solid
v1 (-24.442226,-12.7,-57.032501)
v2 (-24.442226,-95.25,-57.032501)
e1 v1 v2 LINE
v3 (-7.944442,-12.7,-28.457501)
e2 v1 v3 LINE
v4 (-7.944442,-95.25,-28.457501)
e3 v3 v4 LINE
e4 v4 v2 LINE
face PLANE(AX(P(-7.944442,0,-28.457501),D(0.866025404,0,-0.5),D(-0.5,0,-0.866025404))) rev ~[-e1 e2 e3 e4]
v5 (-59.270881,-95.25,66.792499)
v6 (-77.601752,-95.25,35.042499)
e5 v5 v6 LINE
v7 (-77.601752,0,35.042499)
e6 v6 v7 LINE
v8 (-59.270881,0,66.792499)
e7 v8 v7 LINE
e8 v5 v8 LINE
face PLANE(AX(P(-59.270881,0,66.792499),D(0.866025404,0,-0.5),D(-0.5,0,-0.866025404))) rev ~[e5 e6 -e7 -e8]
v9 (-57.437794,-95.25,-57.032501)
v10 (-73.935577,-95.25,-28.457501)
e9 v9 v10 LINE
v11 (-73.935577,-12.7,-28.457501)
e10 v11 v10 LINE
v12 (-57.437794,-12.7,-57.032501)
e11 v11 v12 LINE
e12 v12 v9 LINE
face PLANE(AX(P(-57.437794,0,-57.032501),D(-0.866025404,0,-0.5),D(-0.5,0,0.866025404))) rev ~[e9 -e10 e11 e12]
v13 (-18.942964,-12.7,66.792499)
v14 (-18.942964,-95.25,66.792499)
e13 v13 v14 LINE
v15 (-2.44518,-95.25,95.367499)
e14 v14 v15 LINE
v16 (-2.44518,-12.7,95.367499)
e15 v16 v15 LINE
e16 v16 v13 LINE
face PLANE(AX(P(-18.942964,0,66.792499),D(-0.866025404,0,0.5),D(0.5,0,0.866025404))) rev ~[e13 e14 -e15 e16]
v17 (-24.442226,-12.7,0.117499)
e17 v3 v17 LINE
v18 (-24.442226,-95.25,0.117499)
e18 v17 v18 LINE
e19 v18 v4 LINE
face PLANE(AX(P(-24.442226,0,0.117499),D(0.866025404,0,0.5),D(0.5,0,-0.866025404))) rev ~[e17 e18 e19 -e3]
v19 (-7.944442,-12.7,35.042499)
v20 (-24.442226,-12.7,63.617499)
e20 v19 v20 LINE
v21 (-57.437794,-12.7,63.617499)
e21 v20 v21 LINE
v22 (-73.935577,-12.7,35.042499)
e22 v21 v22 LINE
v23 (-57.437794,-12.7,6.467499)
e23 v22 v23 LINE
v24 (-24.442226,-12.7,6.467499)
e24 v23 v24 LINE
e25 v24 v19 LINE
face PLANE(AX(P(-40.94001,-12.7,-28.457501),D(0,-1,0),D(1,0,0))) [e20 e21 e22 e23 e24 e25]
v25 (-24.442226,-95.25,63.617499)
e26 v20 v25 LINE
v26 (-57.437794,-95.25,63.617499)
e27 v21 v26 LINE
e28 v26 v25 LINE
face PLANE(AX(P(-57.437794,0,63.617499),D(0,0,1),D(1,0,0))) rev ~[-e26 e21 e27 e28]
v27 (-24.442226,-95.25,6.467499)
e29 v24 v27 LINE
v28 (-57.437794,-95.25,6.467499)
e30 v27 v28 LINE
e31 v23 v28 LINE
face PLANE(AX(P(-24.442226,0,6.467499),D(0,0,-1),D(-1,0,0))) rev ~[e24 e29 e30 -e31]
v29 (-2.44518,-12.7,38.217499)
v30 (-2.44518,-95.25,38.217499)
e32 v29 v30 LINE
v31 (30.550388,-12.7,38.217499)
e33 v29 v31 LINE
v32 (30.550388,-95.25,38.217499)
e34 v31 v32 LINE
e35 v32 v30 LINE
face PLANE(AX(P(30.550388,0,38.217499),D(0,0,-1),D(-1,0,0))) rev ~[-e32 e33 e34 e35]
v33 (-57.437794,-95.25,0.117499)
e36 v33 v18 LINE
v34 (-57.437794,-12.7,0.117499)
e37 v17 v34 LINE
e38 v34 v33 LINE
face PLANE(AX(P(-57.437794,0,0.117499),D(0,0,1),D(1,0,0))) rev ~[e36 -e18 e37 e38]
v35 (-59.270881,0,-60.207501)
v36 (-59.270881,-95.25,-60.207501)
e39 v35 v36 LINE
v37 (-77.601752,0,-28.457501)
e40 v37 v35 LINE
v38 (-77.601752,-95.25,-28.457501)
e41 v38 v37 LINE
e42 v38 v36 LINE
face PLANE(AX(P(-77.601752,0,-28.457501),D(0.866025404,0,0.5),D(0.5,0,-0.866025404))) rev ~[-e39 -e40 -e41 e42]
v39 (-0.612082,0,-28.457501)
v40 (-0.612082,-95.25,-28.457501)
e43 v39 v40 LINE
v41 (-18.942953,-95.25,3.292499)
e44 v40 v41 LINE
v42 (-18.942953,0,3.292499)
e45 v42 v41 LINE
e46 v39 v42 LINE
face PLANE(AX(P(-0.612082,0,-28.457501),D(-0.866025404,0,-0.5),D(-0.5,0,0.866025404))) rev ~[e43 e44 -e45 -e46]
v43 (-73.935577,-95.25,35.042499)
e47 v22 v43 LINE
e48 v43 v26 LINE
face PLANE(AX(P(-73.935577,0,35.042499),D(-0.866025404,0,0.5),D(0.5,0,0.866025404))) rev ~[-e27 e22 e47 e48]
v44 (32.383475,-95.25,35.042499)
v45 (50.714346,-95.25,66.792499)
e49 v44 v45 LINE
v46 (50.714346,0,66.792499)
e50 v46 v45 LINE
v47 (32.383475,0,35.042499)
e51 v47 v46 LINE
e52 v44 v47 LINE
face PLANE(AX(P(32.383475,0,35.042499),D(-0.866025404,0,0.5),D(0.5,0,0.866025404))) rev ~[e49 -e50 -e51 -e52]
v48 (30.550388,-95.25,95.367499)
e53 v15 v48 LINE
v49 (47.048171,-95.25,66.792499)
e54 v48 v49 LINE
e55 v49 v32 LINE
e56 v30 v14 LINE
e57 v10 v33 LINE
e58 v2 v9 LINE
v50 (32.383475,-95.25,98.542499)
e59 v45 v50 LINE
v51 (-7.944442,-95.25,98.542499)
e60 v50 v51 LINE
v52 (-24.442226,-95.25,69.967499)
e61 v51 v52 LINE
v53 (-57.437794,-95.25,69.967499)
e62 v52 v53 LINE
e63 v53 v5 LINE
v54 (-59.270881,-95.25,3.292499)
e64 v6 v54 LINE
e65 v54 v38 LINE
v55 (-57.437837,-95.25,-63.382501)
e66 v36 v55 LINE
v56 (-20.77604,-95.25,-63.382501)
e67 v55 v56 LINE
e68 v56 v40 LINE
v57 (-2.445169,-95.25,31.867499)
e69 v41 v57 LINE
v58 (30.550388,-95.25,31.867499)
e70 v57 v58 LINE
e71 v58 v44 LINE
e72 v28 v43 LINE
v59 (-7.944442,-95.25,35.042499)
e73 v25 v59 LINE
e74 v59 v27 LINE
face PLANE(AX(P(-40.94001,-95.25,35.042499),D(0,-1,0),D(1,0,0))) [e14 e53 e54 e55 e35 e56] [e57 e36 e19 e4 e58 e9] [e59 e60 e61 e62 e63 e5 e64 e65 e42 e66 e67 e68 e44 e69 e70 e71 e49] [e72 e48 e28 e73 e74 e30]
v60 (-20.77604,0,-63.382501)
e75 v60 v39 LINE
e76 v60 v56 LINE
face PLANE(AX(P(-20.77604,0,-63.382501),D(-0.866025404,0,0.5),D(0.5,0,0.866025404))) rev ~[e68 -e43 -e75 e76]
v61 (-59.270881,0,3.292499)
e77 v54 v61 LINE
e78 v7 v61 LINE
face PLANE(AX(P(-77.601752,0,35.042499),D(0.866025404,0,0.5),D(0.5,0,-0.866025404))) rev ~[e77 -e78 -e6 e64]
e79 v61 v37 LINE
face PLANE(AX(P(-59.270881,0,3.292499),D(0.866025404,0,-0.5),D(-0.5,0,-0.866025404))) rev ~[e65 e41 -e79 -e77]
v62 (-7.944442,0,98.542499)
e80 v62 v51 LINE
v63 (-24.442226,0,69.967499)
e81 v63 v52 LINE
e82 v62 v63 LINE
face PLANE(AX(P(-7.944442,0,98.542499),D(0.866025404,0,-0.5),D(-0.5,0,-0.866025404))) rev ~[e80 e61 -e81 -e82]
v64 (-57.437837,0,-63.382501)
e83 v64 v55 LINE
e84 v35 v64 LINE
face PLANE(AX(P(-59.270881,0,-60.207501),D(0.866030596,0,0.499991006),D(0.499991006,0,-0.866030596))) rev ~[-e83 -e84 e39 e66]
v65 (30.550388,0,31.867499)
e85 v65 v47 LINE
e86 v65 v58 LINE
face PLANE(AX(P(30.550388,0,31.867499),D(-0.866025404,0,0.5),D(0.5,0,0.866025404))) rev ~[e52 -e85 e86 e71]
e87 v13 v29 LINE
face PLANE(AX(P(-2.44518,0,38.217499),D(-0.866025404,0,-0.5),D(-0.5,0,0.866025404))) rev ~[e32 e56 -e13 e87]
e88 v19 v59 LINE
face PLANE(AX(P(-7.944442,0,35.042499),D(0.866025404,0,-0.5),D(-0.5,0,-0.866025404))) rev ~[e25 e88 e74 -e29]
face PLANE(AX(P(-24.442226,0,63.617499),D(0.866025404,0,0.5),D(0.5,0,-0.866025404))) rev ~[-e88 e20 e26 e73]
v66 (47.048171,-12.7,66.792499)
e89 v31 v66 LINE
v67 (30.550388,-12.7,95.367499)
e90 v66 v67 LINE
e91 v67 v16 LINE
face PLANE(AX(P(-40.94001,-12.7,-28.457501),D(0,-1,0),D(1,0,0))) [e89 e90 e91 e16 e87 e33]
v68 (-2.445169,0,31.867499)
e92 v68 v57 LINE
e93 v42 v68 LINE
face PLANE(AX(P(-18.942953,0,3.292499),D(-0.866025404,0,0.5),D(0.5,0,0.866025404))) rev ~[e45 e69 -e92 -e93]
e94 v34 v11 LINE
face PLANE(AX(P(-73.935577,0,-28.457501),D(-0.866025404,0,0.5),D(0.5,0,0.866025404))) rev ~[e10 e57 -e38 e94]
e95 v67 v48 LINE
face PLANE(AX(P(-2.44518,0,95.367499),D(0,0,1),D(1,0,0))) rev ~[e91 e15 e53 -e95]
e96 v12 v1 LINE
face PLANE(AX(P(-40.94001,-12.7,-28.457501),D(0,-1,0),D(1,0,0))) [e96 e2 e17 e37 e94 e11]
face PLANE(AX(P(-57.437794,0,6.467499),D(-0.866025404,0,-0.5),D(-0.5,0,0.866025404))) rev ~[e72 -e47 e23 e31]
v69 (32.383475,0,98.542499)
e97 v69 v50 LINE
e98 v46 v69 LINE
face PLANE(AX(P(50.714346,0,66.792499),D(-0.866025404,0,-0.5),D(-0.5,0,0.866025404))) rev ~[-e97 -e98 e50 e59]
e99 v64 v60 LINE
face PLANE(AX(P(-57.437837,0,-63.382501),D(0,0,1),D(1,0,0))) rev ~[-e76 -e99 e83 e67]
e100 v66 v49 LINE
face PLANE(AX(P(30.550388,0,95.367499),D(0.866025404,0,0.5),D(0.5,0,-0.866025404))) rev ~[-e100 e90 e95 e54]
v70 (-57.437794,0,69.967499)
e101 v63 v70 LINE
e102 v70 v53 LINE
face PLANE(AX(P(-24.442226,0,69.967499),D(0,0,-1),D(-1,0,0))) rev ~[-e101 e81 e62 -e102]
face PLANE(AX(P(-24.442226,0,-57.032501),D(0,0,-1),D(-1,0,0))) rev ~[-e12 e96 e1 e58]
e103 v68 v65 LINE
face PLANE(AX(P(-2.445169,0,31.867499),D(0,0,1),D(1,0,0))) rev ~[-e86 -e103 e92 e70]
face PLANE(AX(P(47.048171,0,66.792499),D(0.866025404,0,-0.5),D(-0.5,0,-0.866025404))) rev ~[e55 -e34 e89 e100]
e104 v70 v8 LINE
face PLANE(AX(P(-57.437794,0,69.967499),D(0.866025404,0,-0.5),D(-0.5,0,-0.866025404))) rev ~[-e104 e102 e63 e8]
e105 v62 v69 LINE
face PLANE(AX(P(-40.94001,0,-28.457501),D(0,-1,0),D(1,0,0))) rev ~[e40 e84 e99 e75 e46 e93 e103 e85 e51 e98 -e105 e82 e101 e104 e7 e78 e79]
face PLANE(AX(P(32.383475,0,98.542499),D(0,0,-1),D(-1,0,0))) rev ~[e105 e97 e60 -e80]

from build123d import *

# Parameters (mm, degrees)
F1_DEPTH = 12.7
F2_DEPTH = 95.25


# Not quite as in the source:
# - a feature names something its author has since deleted; it is built from what else it names


with BuildPart() as f1:
    # F0 (on Front) → F1 (new body)
    with BuildSketch(Plane.XZ):
        Polygon((-4.278267482, -28.4575006988), (-22.6091385288, 3.2924993012), (-59.2708806223, 3.2924993012), (-77.6017516691, -28.4575006988), (-59.2708806223, -60.2075006988), (-22.6091385288, -60.2075006988), align=None)
        Polygon((-57.4377935176, -57.0325006988), (-73.9355774597, -28.4575006988), (-57.4377935176, 0.1174993012), (-24.4422256334, 0.1174993012), (-7.9444416913, -28.4575006988), (-24.4422256334, -57.0325006988), align=None, mode=Mode.SUBTRACT)
        Polygon((-22.6091385288, 3.2924993012), (-4.278267482, 35.0424993012), (-22.6091385288, 66.7924993012), (-27.4963065598, 66.7924993012), (-59.2708806223, 66.7924993012), (-77.6017516691, 35.0424993012), (-59.2708806223, 3.2924993012), align=None)
        Polygon((-57.4377935176, 6.4674993012), (-73.9355774597, 35.0424993012), (-57.4377935176, 63.6174993012), (-24.4422256334, 63.6174993012), (-7.9444416913, 35.0424993012), (-24.4422256334, 6.4674993012), align=None, mode=Mode.SUBTRACT)
        Polygon((-22.6091385288, 66.7924993012), (-4.278267482, 35.0424993012), (27.4963065701, 35.0424993012), (32.3834746115, 35.0424993012), (50.7143456583, 66.7924993012), (32.3834746115, 98.5424993012), (-4.278267482, 98.5424993012), align=None)
        Polygon((-2.4451803773, 38.2174993012), (-18.9429643194, 66.7924993012), (-2.4451803773, 95.3674993012), (30.5503875069, 95.3674993012), (47.048171449, 66.7924993012), (30.5503875069, 38.2174993012), align=None, mode=Mode.SUBTRACT)
        Polygon((-2.4451803773, 95.3674993012), (-18.9429643194, 66.7924993012), (-2.4451803773, 38.2174993012), (30.5503875069, 38.2174993012), (47.048171449, 66.7924993012), (30.5503875069, 95.3674993012), align=None)
        Polygon((-57.4377935176, 0.1174993012), (-73.9355774597, -28.4575006988), (-57.4377935176, -57.0325006988), (-24.4422256334, -57.0325006988), (-7.9444416913, -28.4575006988), (-24.4422256334, 0.1174993012), align=None)
        Polygon((-57.4377935176, 63.6174993012), (-73.9355774597, 35.0424993012), (-57.4377935176, 6.4674993012), (-24.4422256334, 6.4674993012), (-7.9444416913, 35.0424993012), (-24.4422256334, 63.6174993012), align=None)
    extrude(amount=F1_DEPTH)

    # F0 (on Front) → F2 (join)
    with BuildSketch(Plane.XZ):
        Polygon((-22.6091385288, 3.2924993012), (-4.278267482, 35.0424993012), (-22.6091385288, 66.7924993012), (-27.4963065598, 66.7924993012), (-59.2708806223, 66.7924993012), (-77.6017516691, 35.0424993012), (-59.2708806223, 3.2924993012), align=None)
        Polygon((-57.4377935176, 6.4674993012), (-73.9355774597, 35.0424993012), (-57.4377935176, 63.6174993012), (-24.4422256334, 63.6174993012), (-7.9444416913, 35.0424993012), (-24.4422256334, 6.4674993012), align=None, mode=Mode.SUBTRACT)
        Polygon((-22.6091385288, 66.7924993012), (-4.278267482, 35.0424993012), (27.4963065701, 35.0424993012), (32.3834746115, 35.0424993012), (50.7143456583, 66.7924993012), (32.3834746115, 98.5424993012), (-4.278267482, 98.5424993012), align=None)
        Polygon((-2.4451803773, 38.2174993012), (-18.9429643194, 66.7924993012), (-2.4451803773, 95.3674993012), (30.5503875069, 95.3674993012), (47.048171449, 66.7924993012), (30.5503875069, 38.2174993012), align=None, mode=Mode.SUBTRACT)
        Polygon((-4.278267482, -28.4575006988), (-22.6091385288, 3.2924993012), (-59.2708806223, 3.2924993012), (-77.6017516691, -28.4575006988), (-59.2708806223, -60.2075006988), (-22.6091385288, -60.2075006988), align=None)
        Polygon((-57.4377935176, -57.0325006988), (-73.9355774597, -28.4575006988), (-57.4377935176, 0.1174993012), (-24.4422256334, 0.1174993012), (-7.9444416913, -28.4575006988), (-24.4422256334, -57.0325006988), align=None, mode=Mode.SUBTRACT)
        Polygon((27.4963065701, 35.0424993012), (-4.278267482, 35.0424993012), (-22.6091385288, 3.2924993012), (-4.278267482, -28.4575006988), (-22.6091385288, -60.2075006988), (-59.2708806223, -60.2075006988), (-57.4378374826, -63.3825006988), (-20.7760404334, -63.3825006988), (-0.612082282, -28.4575006988), (-18.9429533288, 3.2924993012), (-2.4451693867, 31.8674993012), (30.5503875069, 31.8674993012), (32.3834746115, 35.0424993012), align=None)
        Polygon((-27.4963065598, 66.7924993012), (-22.6091385288, 66.7924993012), (-4.278267482, 98.5424993012), (-7.9444416913, 98.5424993012), (-24.4422256334, 69.9674993012), (-57.4377935176, 69.9674993012), (-59.2708806223, 66.7924993012), align=None)
    extrude(amount=F2_DEPTH)


solid = f1.part
